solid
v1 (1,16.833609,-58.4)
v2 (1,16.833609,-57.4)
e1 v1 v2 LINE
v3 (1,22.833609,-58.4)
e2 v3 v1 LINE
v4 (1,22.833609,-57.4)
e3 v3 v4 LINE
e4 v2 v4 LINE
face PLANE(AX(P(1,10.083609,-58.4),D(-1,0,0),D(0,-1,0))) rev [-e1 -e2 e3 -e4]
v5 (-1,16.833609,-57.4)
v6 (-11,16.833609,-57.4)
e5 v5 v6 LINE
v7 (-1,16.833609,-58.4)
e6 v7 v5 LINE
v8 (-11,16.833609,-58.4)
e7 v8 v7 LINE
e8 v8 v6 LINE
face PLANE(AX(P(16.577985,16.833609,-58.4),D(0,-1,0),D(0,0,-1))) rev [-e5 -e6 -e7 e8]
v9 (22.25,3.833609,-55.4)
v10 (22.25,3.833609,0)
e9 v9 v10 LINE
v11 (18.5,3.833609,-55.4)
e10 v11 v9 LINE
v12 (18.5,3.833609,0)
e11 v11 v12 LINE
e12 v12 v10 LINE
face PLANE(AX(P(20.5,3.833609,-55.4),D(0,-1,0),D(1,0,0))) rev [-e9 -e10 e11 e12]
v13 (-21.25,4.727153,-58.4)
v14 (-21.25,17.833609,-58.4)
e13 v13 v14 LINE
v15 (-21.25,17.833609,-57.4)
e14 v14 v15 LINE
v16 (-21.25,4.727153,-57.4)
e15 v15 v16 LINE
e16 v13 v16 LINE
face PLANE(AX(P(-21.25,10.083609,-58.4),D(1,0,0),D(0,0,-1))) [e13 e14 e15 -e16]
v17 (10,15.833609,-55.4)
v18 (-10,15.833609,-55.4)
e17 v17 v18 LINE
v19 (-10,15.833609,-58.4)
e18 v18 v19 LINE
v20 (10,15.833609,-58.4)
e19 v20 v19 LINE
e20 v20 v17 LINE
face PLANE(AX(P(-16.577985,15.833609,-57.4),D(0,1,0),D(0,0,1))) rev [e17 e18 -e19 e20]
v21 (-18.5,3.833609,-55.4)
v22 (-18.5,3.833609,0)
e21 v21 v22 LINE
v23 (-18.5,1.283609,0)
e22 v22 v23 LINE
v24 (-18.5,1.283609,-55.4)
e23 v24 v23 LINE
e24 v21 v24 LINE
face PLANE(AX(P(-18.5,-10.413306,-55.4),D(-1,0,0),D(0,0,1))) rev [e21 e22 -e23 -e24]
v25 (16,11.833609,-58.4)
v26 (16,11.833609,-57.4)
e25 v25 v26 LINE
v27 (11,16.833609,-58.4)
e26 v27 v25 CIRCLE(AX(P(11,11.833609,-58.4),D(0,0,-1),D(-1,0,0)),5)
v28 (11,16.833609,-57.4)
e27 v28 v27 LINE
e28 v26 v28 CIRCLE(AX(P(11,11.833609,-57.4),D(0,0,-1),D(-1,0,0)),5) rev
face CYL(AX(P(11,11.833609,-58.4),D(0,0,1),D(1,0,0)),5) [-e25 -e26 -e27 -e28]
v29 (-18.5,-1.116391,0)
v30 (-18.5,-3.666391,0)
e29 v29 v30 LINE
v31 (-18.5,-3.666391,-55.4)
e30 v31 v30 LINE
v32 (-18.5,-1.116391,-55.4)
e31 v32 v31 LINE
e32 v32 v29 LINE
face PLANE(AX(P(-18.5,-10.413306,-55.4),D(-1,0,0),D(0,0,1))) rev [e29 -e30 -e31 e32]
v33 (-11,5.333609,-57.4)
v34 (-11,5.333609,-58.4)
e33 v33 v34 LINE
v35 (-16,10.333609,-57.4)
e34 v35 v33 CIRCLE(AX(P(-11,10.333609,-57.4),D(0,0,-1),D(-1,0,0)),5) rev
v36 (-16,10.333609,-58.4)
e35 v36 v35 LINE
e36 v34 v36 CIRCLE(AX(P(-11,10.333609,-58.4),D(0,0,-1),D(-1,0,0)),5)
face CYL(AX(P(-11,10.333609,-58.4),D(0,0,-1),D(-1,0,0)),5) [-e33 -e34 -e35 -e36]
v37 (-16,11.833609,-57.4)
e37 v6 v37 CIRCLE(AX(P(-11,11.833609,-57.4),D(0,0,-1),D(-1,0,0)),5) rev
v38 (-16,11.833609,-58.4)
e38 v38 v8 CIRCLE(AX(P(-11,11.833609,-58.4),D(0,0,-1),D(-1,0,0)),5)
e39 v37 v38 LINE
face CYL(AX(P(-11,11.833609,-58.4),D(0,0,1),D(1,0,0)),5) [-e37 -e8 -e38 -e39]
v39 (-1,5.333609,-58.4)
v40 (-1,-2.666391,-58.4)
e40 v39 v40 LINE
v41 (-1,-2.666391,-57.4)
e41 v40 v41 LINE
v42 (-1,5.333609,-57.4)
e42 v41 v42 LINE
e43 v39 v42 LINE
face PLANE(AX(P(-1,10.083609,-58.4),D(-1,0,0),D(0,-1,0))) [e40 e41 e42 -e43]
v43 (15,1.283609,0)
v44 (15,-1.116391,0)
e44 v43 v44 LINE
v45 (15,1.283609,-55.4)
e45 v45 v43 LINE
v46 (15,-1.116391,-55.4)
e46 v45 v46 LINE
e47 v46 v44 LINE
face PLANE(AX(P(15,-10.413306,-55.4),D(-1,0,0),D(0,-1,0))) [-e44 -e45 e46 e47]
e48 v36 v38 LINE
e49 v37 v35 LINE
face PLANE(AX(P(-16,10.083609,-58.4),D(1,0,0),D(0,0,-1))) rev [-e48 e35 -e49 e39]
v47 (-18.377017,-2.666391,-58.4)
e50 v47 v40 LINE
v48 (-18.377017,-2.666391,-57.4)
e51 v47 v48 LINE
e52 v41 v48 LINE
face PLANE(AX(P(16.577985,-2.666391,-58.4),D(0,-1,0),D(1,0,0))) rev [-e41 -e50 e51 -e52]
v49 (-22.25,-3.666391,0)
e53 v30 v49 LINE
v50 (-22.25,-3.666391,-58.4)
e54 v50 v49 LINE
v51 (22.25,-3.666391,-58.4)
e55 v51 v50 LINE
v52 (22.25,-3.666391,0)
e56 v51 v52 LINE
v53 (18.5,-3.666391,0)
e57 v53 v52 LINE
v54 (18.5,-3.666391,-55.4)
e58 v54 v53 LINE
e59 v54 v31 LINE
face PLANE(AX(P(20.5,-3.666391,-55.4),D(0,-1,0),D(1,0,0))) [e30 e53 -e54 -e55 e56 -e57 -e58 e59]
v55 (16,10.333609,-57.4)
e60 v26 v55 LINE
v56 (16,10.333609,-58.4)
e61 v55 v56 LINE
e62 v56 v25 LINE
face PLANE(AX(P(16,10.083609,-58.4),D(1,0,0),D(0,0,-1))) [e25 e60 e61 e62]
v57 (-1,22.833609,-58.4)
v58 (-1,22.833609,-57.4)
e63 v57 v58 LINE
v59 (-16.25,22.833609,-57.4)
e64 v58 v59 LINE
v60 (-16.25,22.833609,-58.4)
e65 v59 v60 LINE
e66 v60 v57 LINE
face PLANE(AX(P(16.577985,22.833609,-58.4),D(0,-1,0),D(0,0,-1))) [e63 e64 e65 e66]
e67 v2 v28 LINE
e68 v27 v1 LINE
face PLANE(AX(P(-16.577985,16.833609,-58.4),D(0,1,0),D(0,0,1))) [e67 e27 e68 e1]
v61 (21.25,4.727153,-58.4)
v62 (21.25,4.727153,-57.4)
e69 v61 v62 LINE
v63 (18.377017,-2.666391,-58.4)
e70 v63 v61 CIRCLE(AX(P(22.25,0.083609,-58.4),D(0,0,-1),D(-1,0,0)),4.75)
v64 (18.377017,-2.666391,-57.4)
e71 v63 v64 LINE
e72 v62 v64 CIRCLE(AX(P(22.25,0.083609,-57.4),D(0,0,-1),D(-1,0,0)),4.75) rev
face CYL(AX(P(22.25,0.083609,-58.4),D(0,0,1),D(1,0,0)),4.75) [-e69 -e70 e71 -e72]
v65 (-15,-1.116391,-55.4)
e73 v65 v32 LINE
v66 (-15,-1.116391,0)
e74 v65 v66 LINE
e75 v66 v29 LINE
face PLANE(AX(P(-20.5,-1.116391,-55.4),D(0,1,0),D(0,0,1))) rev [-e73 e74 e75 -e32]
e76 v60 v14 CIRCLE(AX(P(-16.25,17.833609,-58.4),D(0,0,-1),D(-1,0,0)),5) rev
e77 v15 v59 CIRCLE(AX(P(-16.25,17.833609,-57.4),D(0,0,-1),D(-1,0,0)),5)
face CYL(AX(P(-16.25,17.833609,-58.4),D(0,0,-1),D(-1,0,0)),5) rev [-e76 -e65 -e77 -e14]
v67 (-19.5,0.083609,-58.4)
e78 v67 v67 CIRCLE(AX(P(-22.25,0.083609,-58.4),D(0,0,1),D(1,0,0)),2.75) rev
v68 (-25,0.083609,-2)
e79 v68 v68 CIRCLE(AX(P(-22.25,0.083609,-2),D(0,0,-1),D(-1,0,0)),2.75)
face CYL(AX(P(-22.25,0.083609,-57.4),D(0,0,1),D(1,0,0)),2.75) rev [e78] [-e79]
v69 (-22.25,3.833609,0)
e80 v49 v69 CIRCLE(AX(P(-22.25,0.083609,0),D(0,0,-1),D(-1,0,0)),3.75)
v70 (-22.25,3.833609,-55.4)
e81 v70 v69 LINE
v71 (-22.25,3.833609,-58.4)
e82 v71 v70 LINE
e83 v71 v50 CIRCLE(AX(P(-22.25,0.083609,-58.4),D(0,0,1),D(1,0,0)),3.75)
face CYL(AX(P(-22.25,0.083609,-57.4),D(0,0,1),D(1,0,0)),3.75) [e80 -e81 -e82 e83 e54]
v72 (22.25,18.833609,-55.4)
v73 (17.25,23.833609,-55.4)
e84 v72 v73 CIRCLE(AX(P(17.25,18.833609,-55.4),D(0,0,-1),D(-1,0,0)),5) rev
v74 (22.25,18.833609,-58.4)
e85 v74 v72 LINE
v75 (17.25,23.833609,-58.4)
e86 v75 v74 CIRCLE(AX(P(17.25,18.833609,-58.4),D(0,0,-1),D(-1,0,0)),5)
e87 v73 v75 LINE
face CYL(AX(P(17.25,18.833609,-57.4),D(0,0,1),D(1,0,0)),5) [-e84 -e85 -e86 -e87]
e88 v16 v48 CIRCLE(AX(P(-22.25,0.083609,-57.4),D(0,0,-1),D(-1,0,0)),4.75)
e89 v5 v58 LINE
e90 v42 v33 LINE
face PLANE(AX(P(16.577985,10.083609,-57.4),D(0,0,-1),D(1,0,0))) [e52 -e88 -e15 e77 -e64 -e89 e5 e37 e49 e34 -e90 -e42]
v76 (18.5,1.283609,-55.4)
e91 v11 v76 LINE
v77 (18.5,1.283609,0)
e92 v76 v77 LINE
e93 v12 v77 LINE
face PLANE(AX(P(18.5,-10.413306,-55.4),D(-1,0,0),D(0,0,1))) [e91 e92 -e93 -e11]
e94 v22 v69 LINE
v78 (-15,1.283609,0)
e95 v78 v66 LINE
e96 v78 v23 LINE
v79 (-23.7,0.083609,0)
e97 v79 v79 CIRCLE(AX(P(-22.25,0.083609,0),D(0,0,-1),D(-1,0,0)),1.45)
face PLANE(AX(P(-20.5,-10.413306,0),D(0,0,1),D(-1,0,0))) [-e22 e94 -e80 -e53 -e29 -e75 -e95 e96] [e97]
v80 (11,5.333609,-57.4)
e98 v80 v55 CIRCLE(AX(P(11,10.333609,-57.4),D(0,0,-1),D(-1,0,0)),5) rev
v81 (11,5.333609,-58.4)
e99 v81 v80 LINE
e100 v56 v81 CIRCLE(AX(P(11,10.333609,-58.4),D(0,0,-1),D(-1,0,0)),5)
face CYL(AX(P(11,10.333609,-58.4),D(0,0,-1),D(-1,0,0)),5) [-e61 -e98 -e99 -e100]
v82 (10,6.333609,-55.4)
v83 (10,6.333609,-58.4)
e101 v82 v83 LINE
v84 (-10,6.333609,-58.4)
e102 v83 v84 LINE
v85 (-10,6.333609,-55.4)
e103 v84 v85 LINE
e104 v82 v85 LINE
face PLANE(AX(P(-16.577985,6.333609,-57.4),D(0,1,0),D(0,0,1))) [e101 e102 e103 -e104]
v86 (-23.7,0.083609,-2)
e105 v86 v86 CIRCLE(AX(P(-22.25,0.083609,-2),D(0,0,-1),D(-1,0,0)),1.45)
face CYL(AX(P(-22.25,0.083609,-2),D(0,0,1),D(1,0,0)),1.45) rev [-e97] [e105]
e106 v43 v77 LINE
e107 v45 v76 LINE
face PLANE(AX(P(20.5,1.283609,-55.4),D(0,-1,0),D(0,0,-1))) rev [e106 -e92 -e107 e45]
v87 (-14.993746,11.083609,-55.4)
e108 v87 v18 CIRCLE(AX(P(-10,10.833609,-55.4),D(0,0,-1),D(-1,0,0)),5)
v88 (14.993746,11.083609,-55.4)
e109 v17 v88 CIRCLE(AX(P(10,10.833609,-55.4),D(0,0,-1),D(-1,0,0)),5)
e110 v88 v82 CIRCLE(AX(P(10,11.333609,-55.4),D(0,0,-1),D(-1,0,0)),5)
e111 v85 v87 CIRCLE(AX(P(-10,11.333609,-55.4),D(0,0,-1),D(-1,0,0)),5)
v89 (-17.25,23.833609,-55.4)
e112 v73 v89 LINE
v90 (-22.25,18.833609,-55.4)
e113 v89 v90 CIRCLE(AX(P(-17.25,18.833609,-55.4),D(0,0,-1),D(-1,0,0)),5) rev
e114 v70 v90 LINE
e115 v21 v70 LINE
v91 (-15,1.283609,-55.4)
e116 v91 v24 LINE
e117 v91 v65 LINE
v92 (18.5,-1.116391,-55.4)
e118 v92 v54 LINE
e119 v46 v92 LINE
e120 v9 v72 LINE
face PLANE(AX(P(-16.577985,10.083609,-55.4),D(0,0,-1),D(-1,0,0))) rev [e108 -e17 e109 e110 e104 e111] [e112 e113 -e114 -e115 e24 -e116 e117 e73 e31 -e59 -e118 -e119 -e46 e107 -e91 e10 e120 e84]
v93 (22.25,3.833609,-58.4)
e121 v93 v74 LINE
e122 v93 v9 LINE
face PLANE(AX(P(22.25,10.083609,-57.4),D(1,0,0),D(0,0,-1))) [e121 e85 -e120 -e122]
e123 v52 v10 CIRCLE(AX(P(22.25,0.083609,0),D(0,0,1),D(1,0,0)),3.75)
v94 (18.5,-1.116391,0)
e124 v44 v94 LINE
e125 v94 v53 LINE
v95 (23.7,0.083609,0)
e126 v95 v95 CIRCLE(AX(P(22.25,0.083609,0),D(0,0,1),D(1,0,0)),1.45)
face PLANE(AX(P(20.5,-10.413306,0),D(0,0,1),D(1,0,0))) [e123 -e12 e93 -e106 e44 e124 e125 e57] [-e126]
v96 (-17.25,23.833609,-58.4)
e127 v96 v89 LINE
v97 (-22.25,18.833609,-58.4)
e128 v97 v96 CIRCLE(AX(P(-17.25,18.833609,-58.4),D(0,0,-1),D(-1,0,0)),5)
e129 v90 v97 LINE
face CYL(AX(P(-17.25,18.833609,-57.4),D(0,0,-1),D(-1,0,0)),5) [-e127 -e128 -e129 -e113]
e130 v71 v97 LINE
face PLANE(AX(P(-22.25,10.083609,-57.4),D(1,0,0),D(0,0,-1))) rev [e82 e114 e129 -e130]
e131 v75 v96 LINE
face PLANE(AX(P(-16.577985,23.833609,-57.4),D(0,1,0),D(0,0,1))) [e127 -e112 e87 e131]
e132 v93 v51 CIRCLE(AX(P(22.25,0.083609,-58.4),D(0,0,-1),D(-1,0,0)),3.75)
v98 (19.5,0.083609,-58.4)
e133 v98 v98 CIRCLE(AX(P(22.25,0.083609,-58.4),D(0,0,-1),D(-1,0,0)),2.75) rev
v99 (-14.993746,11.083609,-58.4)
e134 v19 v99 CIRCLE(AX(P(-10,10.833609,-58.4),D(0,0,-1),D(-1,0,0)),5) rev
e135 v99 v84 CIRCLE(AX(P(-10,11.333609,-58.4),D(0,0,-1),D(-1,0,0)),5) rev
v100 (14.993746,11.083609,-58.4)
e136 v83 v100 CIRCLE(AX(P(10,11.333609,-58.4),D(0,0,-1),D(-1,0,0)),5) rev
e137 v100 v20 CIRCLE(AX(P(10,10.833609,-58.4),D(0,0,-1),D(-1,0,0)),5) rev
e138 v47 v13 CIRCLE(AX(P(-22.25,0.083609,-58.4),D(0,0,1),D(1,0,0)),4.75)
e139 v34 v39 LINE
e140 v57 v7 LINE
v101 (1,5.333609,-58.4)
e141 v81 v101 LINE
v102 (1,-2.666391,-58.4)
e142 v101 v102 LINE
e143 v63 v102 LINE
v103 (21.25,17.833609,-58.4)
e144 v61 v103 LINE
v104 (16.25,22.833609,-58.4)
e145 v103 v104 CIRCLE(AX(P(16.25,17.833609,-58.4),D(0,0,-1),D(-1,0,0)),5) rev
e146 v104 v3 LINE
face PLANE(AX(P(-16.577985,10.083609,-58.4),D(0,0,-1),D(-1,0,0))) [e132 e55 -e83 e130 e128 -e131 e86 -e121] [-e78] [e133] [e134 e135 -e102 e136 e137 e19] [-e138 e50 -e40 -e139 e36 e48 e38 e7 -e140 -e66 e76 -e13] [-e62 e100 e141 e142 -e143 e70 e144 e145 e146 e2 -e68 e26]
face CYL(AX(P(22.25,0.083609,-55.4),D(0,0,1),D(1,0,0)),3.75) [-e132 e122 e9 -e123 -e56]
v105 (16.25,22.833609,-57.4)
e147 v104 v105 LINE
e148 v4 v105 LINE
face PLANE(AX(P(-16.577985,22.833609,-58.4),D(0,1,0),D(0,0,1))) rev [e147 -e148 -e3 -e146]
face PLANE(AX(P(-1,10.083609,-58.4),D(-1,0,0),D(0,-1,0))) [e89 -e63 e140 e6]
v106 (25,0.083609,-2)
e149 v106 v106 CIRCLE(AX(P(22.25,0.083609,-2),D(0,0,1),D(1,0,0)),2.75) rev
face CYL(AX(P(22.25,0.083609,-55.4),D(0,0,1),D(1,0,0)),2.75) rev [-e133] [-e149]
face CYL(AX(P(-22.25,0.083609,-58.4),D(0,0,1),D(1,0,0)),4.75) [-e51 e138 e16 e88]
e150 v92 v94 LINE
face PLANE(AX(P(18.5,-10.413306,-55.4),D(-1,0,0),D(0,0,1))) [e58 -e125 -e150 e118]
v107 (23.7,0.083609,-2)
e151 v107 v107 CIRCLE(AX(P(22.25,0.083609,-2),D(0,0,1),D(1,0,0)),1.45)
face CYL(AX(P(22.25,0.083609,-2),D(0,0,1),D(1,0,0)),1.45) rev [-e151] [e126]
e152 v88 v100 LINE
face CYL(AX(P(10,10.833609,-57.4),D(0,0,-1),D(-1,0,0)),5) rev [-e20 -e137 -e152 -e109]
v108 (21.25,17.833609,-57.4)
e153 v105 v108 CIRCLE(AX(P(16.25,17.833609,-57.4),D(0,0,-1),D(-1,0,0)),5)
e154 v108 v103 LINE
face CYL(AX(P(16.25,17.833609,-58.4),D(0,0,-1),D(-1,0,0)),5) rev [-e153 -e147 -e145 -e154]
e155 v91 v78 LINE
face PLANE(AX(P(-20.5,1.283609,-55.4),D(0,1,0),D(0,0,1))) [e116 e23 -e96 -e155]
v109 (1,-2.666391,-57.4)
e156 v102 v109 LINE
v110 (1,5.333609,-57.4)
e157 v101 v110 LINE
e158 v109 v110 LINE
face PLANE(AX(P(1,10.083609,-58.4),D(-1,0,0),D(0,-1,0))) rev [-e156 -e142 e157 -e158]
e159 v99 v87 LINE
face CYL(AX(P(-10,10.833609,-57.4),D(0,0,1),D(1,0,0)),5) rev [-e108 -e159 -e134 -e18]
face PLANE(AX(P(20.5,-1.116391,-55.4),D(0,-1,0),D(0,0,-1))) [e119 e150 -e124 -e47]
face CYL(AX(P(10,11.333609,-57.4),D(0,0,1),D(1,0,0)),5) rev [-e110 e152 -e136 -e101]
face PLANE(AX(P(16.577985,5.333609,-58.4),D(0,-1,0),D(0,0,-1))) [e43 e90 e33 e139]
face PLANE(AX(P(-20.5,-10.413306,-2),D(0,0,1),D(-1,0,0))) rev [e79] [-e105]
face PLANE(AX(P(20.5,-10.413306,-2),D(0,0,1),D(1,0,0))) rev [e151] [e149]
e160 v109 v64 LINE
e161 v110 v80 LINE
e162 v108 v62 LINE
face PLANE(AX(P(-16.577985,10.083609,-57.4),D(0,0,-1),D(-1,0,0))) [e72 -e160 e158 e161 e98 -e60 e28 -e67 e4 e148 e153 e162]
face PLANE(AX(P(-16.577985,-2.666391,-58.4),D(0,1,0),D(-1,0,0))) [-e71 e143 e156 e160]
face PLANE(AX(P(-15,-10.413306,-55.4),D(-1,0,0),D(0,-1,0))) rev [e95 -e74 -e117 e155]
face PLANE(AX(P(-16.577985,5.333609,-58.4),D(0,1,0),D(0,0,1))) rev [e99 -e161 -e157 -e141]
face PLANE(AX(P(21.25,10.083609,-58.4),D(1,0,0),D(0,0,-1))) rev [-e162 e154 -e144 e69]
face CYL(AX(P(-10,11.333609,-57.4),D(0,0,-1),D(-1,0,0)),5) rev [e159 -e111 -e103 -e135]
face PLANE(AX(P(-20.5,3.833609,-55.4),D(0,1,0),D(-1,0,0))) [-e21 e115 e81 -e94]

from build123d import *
from build123d.topology import SkipClean

# Parameters (mm, degrees)
SKETCH_1_W           = 3.5
SKETCH_1_H           = 1.2
EXTRUDE_1_DEPTH      = 55.4
EXTRUDE_2_DEPTH      = 2
SKETCH_2_W           = 1
SKETCH_2_H           = 8
EXTRUDE_4_DEPTH      = 2
SKETCH_2_3_W         = 1
SKETCH_2_3_H         = 8
EXTRUDE_6_DEPTH      = 3
FILLET_1_R           = 5
MIRROR_START         = -57.4
MIRROR_2_OUTLINE_R   = 2.75
MIRROR_2_DEPTH       = 2
MIRROR_START_2       = -58.4
MIRROR_2_2_OUTLINE_R = 2.75
MIRROR_2_2_DEPTH     = 1


# Read off the part's stored shape, not the designer's step: 镜向2
with BuildPart() as part:
    # 草图1 → 拉伸1 (new body)
    with BuildSketch(Plane.XY):
        with BuildLine():
            ThreePointArc((19.5, 0.083609377), (22.25, 2.833609377), (25, 0.083609377))
            Line((25, 0.083609377), (26, 0.083609377))
            ThreePointArc((26, 0.083609377), (24.901650429, 2.735259807), (22.25, 3.833609377))
            ThreePointArc((22.25, 3.833609377), (19.598349571, 2.735259807), (18.5, 0.083609377))
            Line((18.5, 0.083609377), (19.5, 0.083609377))
        make_face()
        with BuildLine():
            Line((26, 0.083609377), (25, 0.083609377))
            ThreePointArc((25, 0.083609377), (22.25, -2.666390623), (19.5, 0.083609377))
            Line((19.5, 0.083609377), (18.5, 0.083609377))
            ThreePointArc((18.5, 0.083609377), (19.598349571, -2.568041052), (22.25, -3.666390623))
            ThreePointArc((22.25, -3.666390623), (24.901650429, -2.568041052), (26, 0.083609377))
        make_face()
        with BuildLine():
            ThreePointArc((19.5, 0.083609377), (22.25, 2.833609377), (25, 0.083609377))
            Line((25, 0.083609377), (26, 0.083609377))
            ThreePointArc((26, 0.083609377), (24.901650429, 2.735259807), (22.25, 3.833609377))
            ThreePointArc((22.25, 3.833609377), (19.598349571, 2.735259807), (18.5, 0.083609377))
            Line((18.5, 0.083609377), (19.5, 0.083609377))
        make_face()
        with BuildLine():
            Line((26, 0.083609377), (25, 0.083609377))
            ThreePointArc((25, 0.083609377), (22.25, -2.666390623), (19.5, 0.083609377))
            Line((19.5, 0.083609377), (18.5, 0.083609377))
            ThreePointArc((18.5, 0.083609377), (19.598349571, -2.568041052), (22.25, -3.666390623))
            ThreePointArc((22.25, -3.666390623), (24.901650429, -2.568041052), (26, 0.083609377))
        make_face()
        with BuildLine():
            ThreePointArc((18.5, 0.083609377), (19.598349571, 2.735259807), (22.25, 3.833609377))
            Line((22.25, 3.833609377), (18.5, 3.833609377))
            Line((18.5, 3.833609377), (18.5, 1.283609377))
            Line((18.5, 1.283609377), (18.5, 0.083609377))
        make_face()
        with BuildLine():
            Line((18.5, -3.666390623), (22.25, -3.666390623))
            ThreePointArc((22.25, -3.666390623), (19.598349571, -2.568041052), (18.5, 0.083609377))
            Line((18.5, 0.083609377), (18.5, -1.116390623))
            Line((18.5, -1.116390623), (18.5, -3.666390623))
        make_face()
        with Locations((16.75, -0.516390623)):
            Rectangle(SKETCH_1_W, SKETCH_1_H)
        with Locations((16.75, 0.683609377)):
            Rectangle(SKETCH_1_W, SKETCH_1_H)
    extrude_1 = extrude(amount=-EXTRUDE_1_DEPTH)

    # 草图1<3> → 拉伸2 (add)
    with BuildSketch(Plane.XY):
        with BuildLine():
            ThreePointArc((20.8, 0.083609377), (22.25, 1.533609377), (23.7, 0.083609377))
            Line((23.7, 0.083609377), (25, 0.083609377))
            ThreePointArc((25, 0.083609377), (22.25, 2.833609377), (19.5, 0.083609377))
            Line((19.5, 0.083609377), (20.8, 0.083609377))
        make_face()
        with BuildLine():
            Line((25, 0.083609377), (23.7, 0.083609377))
            ThreePointArc((23.7, 0.083609377), (22.25, -1.366390623), (20.8, 0.083609377))
            Line((20.8, 0.083609377), (19.5, 0.083609377))
            ThreePointArc((19.5, 0.083609377), (22.25, -2.666390623), (25, 0.083609377))
        make_face()
        with BuildLine():
            ThreePointArc((20.8, 0.083609377), (22.25, 1.533609377), (23.7, 0.083609377))
            Line((23.7, 0.083609377), (25, 0.083609377))
            ThreePointArc((25, 0.083609377), (22.25, 2.833609377), (19.5, 0.083609377))
            Line((19.5, 0.083609377), (20.8, 0.083609377))
        make_face()
        with BuildLine():
            Line((25, 0.083609377), (23.7, 0.083609377))
            ThreePointArc((23.7, 0.083609377), (22.25, -1.366390623), (20.8, 0.083609377))
            Line((20.8, 0.083609377), (19.5, 0.083609377))
            ThreePointArc((19.5, 0.083609377), (22.25, -2.666390623), (25, 0.083609377))
        make_face()
    extrude_2 = extrude(amount=-EXTRUDE_2_DEPTH)

    # 草图2 → 拉伸4 (add)
    # profile 1 of 10: a face of its own
    with SkipClean():  # the faces are left unmerged after this step: merging them gives an invalid solid
        with BuildSketch(Plane(origin=(0, 0, -55.4), x_dir=(-1, 0, 0), z_dir=(0, 0, -1))):
            with BuildLine():
                Line((-22.25, 23.833609377), (-22.25, 3.833609377))
                Line((-22.25, 3.833609377), (-19.334524053, 3.833609377))
                ThreePointArc((-19.334524053, 3.833609377), (-20.241930491, 4.388276246), (-21.25, 4.727153282))
                Line((-21.25, 4.727153282), (-21.25, 22.833609377))
                Line((-21.25, 22.833609377), (-1, 22.833609377))
                Line((-1, 22.833609377), (-1, 16.833609377))
                Line((-1, 16.833609377), (-16, 16.833609377))
                Line((-16, 16.833609377), (-16, 5.333609377))
                Line((-16, 5.333609377), (-1, 5.333609377))
                Line((-1, 5.333609377), (0, 5.333609377))
                Line((0, 5.333609377), (0, 6.333609377))
                Line((0, 6.333609377), (-15, 6.333609377))
                Line((-15, 6.333609377), (-15, 15.833609377))
                Line((-15, 15.833609377), (0, 15.833609377))
                Line((0, 15.833609377), (0, 23.833609377))
                Line((0, 23.833609377), (-22.25, 23.833609377))
            make_face()
        # profile 2 of 10: a face of its own
        with BuildSketch(Plane(origin=(0, 0, -55.4), x_dir=(-1, 0, 0), z_dir=(0, 0, -1))):
            with BuildLine():
                ThreePointArc((-17.654077894, -1.116390623), (-17.945210239, -1.924196667), (-18.377016654, -2.666390623))
                Line((-18.377016654, -2.666390623), (-1, -2.666390623))
                Line((-1, -2.666390623), (-1, 5.333609377))
                Line((-1, 5.333609377), (-16, 5.333609377))
                Line((-16, 5.333609377), (-16, 16.833609377))
                Line((-16, 16.833609377), (-1, 16.833609377))
                Line((-1, 16.833609377), (-1, 22.833609377))
                Line((-1, 22.833609377), (-21.25, 22.833609377))
                Line((-21.25, 22.833609377), (-21.25, 4.727153282))
                ThreePointArc((-21.25, 4.727153282), (-20.241930491, 4.388276246), (-19.334524053, 3.833609377))
                Line((-19.334524053, 3.833609377), (-18.5, 3.833609377))
                Line((-18.5, 3.833609377), (-18.5, 2.999085325))
                ThreePointArc((-18.5, 2.999085325), (-17.989798317, 2.184366769), (-17.654077894, 1.283609377))
                Line((-17.654077894, 1.283609377), (-15, 1.283609377))
                Line((-15, 1.283609377), (-15, -1.116390623))
                Line((-15, -1.116390623), (-17.654077894, -1.116390623))
            make_face()
        # profile 3 of 10: a face of its own
        with BuildSketch(Plane(origin=(0, 0, -55.4), x_dir=(-1, 0, 0), z_dir=(0, 0, -1))):
            with Locations((-0.5, 1.333609377)):
                Rectangle(SKETCH_2_W, SKETCH_2_H)
        # profile 4 of 10: a face of its own
        with BuildSketch(Plane(origin=(0, 0, -55.4), x_dir=(-1, 0, 0), z_dir=(0, 0, -1))):
            with BuildLine():
                ThreePointArc((-17.654077894, 1.283609377), (-17.989798317, 2.184366769), (-18.5, 2.999085325))
                Line((-18.5, 2.999085325), (-18.5, 1.283609377))
                Line((-18.5, 1.283609377), (-17.654077894, 1.283609377))
            make_face()
        # profile 5 of 10: a face of its own
        with BuildSketch(Plane(origin=(0, 0, -55.4), x_dir=(-1, 0, 0), z_dir=(0, 0, -1))):
            with BuildLine():
                Line((-18.5, -1.116390623), (-18.5, -2.666390623))
                Line((-18.5, -2.666390623), (-18.377016654, -2.666390623))
                ThreePointArc((-18.377016654, -2.666390623), (-17.945210239, -1.924196667), (-17.654077894, -1.116390623))
                Line((-17.654077894, -1.116390623), (-18.5, -1.116390623))
            make_face()
        # profile 6 of 10: a face of its own
        with BuildSketch(Plane(origin=(0, 0, -55.4), x_dir=(-1, 0, 0), z_dir=(0, 0, -1))):
            with BuildLine():
                ThreePointArc((-17.654077894, 1.283609377), (-17.5, 0.083609377), (-17.654077894, -1.116390623))
                Line((-17.654077894, -1.116390623), (-15, -1.116390623))
                Line((-15, -1.116390623), (-15, 1.283609377))
                Line((-15, 1.283609377), (-17.654077894, 1.283609377))
            make_face()
        # profile 7 of 10: a face of its own
        with BuildSketch(Plane(origin=(0, 0, -55.4), x_dir=(-1, 0, 0), z_dir=(0, 0, -1))):
            with BuildLine():
                Line((-22.25, -3.666390623), (-18.5, -3.666390623))
                Line((-18.5, -3.666390623), (-18.5, -2.666390623))
                Line((-18.5, -2.666390623), (-18.5, -1.116390623))
                Line((-18.5, -1.116390623), (-17.654077894, -1.116390623))
                ThreePointArc((-17.654077894, -1.116390623), (-17.5, 0.083609377), (-17.654077894, 1.283609377))
                Line((-17.654077894, 1.283609377), (-18.5, 1.283609377))
                Line((-18.5, 1.283609377), (-18.5, 2.999085325))
                ThreePointArc((-18.5, 2.999085325), (-18.891242789, 3.442366588), (-19.334524053, 3.833609377))
                Line((-19.334524053, 3.833609377), (-22.25, 3.833609377))
                ThreePointArc((-22.25, 3.833609377), (-21.745411195, 3.799506327), (-21.25, 3.697817451))
                ThreePointArc((-21.25, 3.697817451), (-19.265665903, 2.354347143), (-18.5, 0.083609377))
                ThreePointArc((-18.5, 0.083609377), (-19.598349571, -2.568041052), (-22.25, -3.666390623))
            make_face()
        # profile 8 of 10: a face of its own
        with BuildSketch(Plane(origin=(0, 0, -55.4), x_dir=(-1, 0, 0), z_dir=(0, 0, -1))):
            with BuildLine():
                ThreePointArc((-22.25, 3.833609377), (-26, 0.083609377), (-22.25, -3.666390623))
                ThreePointArc((-22.25, -3.666390623), (-19.598349571, -2.568041052), (-18.5, 0.083609377))
                ThreePointArc((-18.5, 0.083609377), (-19.265665903, 2.354347143), (-21.25, 3.697817451))
                ThreePointArc((-21.25, 3.697817451), (-21.745411195, 3.799506327), (-22.25, 3.833609377))
            make_face()
            with BuildLine():
                ThreePointArc((-22.25, -2.666390623), (-24.952524621, 0.592392901), (-21.25, 2.645347069))
                ThreePointArc((-21.25, 2.645347069), (-19.979262234, 1.634818583), (-19.5, 0.083609377))
                ThreePointArc((-19.5, 0.083609377), (-20.305456352, -1.860934271), (-22.25, -2.666390623))
            make_face(mode=Mode.SUBTRACT)
        # profile 9 of 10: a face of its own
        with BuildSketch(Plane(origin=(0, 0, -55.4), x_dir=(-1, 0, 0), z_dir=(0, 0, -1))):
            Polygon((-18.5, -2.666390623), (-18.5, -3.666390623), (0, -3.666390623), (0, -2.666390623), (-1, -2.666390623), (-18.377016654, -2.666390623), align=None)
        # profile 10 of 10: a face of its own
        with BuildSketch(Plane(origin=(0, 0, -55.4), x_dir=(-1, 0, 0), z_dir=(0, 0, -1))):
            with BuildLine():
                Line((-18.5, 3.833609377), (-19.334524053, 3.833609377))
                ThreePointArc((-19.334524053, 3.833609377), (-18.891242789, 3.442366588), (-18.5, 2.999085325))
                Line((-18.5, 2.999085325), (-18.5, 3.833609377))
            make_face()
        extrude(amount=EXTRUDE_4_DEPTH)

    # 草图2<3> → 拉伸6 (add)
    # profile 1 of 7: a face of its own
    with SkipClean():  # the faces are left unmerged after this step: merging them gives an invalid solid
        with BuildSketch(Plane(origin=(0, 0, -55.4), x_dir=(-1, 0, 0), z_dir=(0, 0, -1))):
            with BuildLine():
                Line((-22.25, 23.833609377), (-22.25, 3.833609377))
                Line((-22.25, 3.833609377), (-19.334524053, 3.833609377))
                ThreePointArc((-19.334524053, 3.833609377), (-20.241930491, 4.388276246), (-21.25, 4.727153282))
                Line((-21.25, 4.727153282), (-21.25, 22.833609377))
                Line((-21.25, 22.833609377), (-1, 22.833609377))
                Line((-1, 22.833609377), (-1, 16.833609377))
                Line((-1, 16.833609377), (-16, 16.833609377))
                Line((-16, 16.833609377), (-16, 5.333609377))
                Line((-16, 5.333609377), (-1, 5.333609377))
                Line((-1, 5.333609377), (0, 5.333609377))
                Line((0, 5.333609377), (0, 6.333609377))
                Line((0, 6.333609377), (-15, 6.333609377))
                Line((-15, 6.333609377), (-15, 15.833609377))
                Line((-15, 15.833609377), (0, 15.833609377))
                Line((0, 15.833609377), (0, 23.833609377))
                Line((0, 23.833609377), (-22.25, 23.833609377))
            make_face()
        # profile 2 of 7: a face of its own
        with BuildSketch(Plane(origin=(0, 0, -55.4), x_dir=(-1, 0, 0), z_dir=(0, 0, -1))):
            with BuildLine():
                Line((-22.25, -3.666390623), (-18.5, -3.666390623))
                Line((-18.5, -3.666390623), (-18.5, -2.666390623))
                Line((-18.5, -2.666390623), (-18.5, -1.116390623))
                Line((-18.5, -1.116390623), (-17.654077894, -1.116390623))
                ThreePointArc((-17.654077894, -1.116390623), (-17.5, 0.083609377), (-17.654077894, 1.283609377))
                Line((-17.654077894, 1.283609377), (-18.5, 1.283609377))
                Line((-18.5, 1.283609377), (-18.5, 2.999085325))
                ThreePointArc((-18.5, 2.999085325), (-18.891242789, 3.442366588), (-19.334524053, 3.833609377))
                Line((-19.334524053, 3.833609377), (-22.25, 3.833609377))
                ThreePointArc((-22.25, 3.833609377), (-21.745411195, 3.799506327), (-21.25, 3.697817451))
                ThreePointArc((-21.25, 3.697817451), (-19.265665903, 2.354347143), (-18.5, 0.083609377))
                ThreePointArc((-18.5, 0.083609377), (-19.598349571, -2.568041052), (-22.25, -3.666390623))
            make_face()
        # profile 3 of 7: a face of its own
        with BuildSketch(Plane(origin=(0, 0, -55.4), x_dir=(-1, 0, 0), z_dir=(0, 0, -1))):
            with BuildLine():
                ThreePointArc((-17.654077894, 1.283609377), (-17.989798317, 2.184366769), (-18.5, 2.999085325))
                Line((-18.5, 2.999085325), (-18.5, 1.283609377))
                Line((-18.5, 1.283609377), (-17.654077894, 1.283609377))
            make_face()
        # profile 4 of 7: a face of its own
        with BuildSketch(Plane(origin=(0, 0, -55.4), x_dir=(-1, 0, 0), z_dir=(0, 0, -1))):
            with BuildLine():
                Line((-18.5, -1.116390623), (-18.5, -2.666390623))
                Line((-18.5, -2.666390623), (-18.377016654, -2.666390623))
                ThreePointArc((-18.377016654, -2.666390623), (-17.945210239, -1.924196667), (-17.654077894, -1.116390623))
                Line((-17.654077894, -1.116390623), (-18.5, -1.116390623))
            make_face()
        # profile 5 of 7: a face of its own
        with BuildSketch(Plane(origin=(0, 0, -55.4), x_dir=(-1, 0, 0), z_dir=(0, 0, -1))):
            Polygon((-18.5, -2.666390623), (-18.5, -3.666390623), (0, -3.666390623), (0, -2.666390623), (-1, -2.666390623), (-18.377016654, -2.666390623), align=None)
        # profile 6 of 7: a face of its own
        with BuildSketch(Plane(origin=(0, 0, -55.4), x_dir=(-1, 0, 0), z_dir=(0, 0, -1))):
            with Locations((-0.5, 1.333609377)):
                Rectangle(SKETCH_2_3_W, SKETCH_2_3_H)
        # profile 7 of 7: a face of its own
        with BuildSketch(Plane(origin=(0, 0, -55.4), x_dir=(-1, 0, 0), z_dir=(0, 0, -1))):
            with BuildLine():
                ThreePointArc((-22.25, 3.833609377), (-26, 0.083609377), (-22.25, -3.666390623))
                ThreePointArc((-22.25, -3.666390623), (-19.598349571, -2.568041052), (-18.5, 0.083609377))
                ThreePointArc((-18.5, 0.083609377), (-19.265665903, 2.354347143), (-21.25, 3.697817451))
                ThreePointArc((-21.25, 3.697817451), (-21.745411195, 3.799506327), (-22.25, 3.833609377))
            make_face()
            with BuildLine():
                ThreePointArc((-22.25, -2.666390623), (-24.952524621, 0.592392901), (-21.25, 2.645347069))
                ThreePointArc((-21.25, 2.645347069), (-19.979262234, 1.634818583), (-19.5, 0.083609377))
                ThreePointArc((-19.5, 0.083609377), (-20.305456352, -1.860934271), (-22.25, -2.666390623))
            make_face(mode=Mode.SUBTRACT)
        extrude(amount=EXTRUDE_6_DEPTH)

    # 圆角1
    # the kernel refuses this fillet: 5 mm, written as the material it adds along each edge
    with BuildSketch(Plane(origin=(21.25, 22.833609377, -44.9), x_dir=(0, -1, 0), z_dir=(0, 0, -1))) as fillet_1_piece_1_section:
        with BuildLine():
            CenterArc((FILLET_1_R, FILLET_1_R), FILLET_1_R, 180, 90)
            Line((0, FILLET_1_R), (0, 0))
            Line((0, 0), (FILLET_1_R, 0))
        make_face()
    fillet_1_piece_1 = extrude(amount=13.5, mode=Mode.PRIVATE)
    fillet_1_piece_1 = split(fillet_1_piece_1, bisect_by=Plane(origin=(20.133160305, 21.716769682, -55.4), z_dir=(0, 0, -1)), keep=Keep.TOP, mode=Mode.PRIVATE)
    add(fillet_1_piece_1)
    with BuildSketch(Plane(origin=(15, 6.333609377, -55.4), x_dir=(-1, 0, 0), z_dir=(0, 0, -1)), Plane(origin=(15, 15.833609377, -55.4), x_dir=(0, -1, 0), z_dir=(0, 0, -1))) as fillet_1_piece_2:
        with BuildLine():
            CenterArc((FILLET_1_R, FILLET_1_R), FILLET_1_R, 180, 90)
            Line((0, FILLET_1_R), (0, 0))
            Line((0, 0), (FILLET_1_R, 0))
        make_face()
    extrude(amount=2)
    with BuildSketch(Plane(origin=(15, 15.833609377, -57.4), x_dir=(0, -1, 0), z_dir=(0, 0, -1)), Plane(origin=(15, 6.333609377, -57.4), x_dir=(-1, 0, 0), z_dir=(0, 0, -1))) as fillet_1_piece_3:
        with BuildLine():
            CenterArc((FILLET_1_R, FILLET_1_R), FILLET_1_R, 180, 90)
            Line((0, FILLET_1_R), (0, 0))
            Line((0, 0), (FILLET_1_R, 0))
        make_face()
    extrude(amount=1)
    # the kernel refuses this fillet: 5 mm, written as the material it takes off along each edge
    with BuildSketch(Plane(origin=(16, 5.333609377, -57.4), x_dir=(0, 1, 0), z_dir=(0, 0, -1)), Plane(origin=(16, 16.833609377, -57.4), x_dir=(-1, 0, 0), z_dir=(0, 0, -1)), Plane(origin=(22.25, 23.833609377, -57.4), x_dir=(-1, 0, 0), z_dir=(0, 0, -1))) as fillet_1_2_piece_1:
        with BuildLine():
            CenterArc((FILLET_1_R, -FILLET_1_R), FILLET_1_R, 90, 90)
            Line((0, -FILLET_1_R), (0, 0))
            Line((0, 0), (FILLET_1_R, 0))
        make_face()
    extrude(amount=13.5, mode=Mode.SUBTRACT)
    with BuildSketch(Plane(origin=(22.25, 23.833609377, -42.9), x_dir=(-1, 0, 0), z_dir=(0, 0, -1))) as fillet_1_2_piece_2:
        with BuildLine():
            CenterArc((FILLET_1_R, -FILLET_1_R), FILLET_1_R, 90, 90)
            Line((0, -FILLET_1_R), (0, 0))
            Line((0, 0), (FILLET_1_R, 0))
        make_face()
    extrude(amount=14.5, mode=Mode.SUBTRACT)

    # 镜向2 outline → 镜向2 (add)
    with BuildSketch(Plane.XY.offset(MIRROR_START)):
        with BuildLine():
            ThreePointArc((-22.25, 3.833609377), (-26, 0.083609377), (-22.25, -3.666390623))
            Line((-22.25, -3.666390623), (0, -3.666390623))
            Line((0, -3.666390623), (0, 6.333609377))
            Line((0, 6.333609377), (-10, 6.333609377))
            ThreePointArc((-10, 6.333609377), (-13.446012188, 7.710765191), (-14.993746089, 11.083609377))
            ThreePointArc((-14.993746089, 11.083609377), (-13.446012188, 14.456453564), (-10, 15.833609377))
            Line((-10, 15.833609377), (0, 15.833609377))
            Line((0, 15.833609377), (0, 23.833609377))
            Line((0, 23.833609377), (-17.25, 23.833609377))
            ThreePointArc((-17.25, 23.833609377), (-20.785533906, 22.369143283), (-22.25, 18.833609377))
            Line((-22.25, 18.833609377), (-22.25, 3.833609377))
        make_face()
        with Locations((-22.25, 0.083609377)):
            Circle(MIRROR_2_OUTLINE_R, mode=Mode.SUBTRACT)
    extrude(amount=MIRROR_2_DEPTH)

    # Mirror 2 2 outline → Mirror 2 2 (add)
    with BuildSketch(Plane.XY.offset(MIRROR_START_2)):
        with BuildLine():
            ThreePointArc((-22.25, 3.833609377), (-26, 0.083609377), (-22.25, -3.666390623))
            Line((-22.25, -3.666390623), (0, -3.666390623))
            Line((0, -3.666390623), (0, 6.333609377))
            Line((0, 6.333609377), (-10, 6.333609377))
            ThreePointArc((-10, 6.333609377), (-13.446012188, 7.710765191), (-14.993746089, 11.083609377))
            ThreePointArc((-14.993746089, 11.083609377), (-13.446012188, 14.456453564), (-10, 15.833609377))
            Line((-10, 15.833609377), (0, 15.833609377))
            Line((0, 15.833609377), (0, 23.833609377))
            Line((0, 23.833609377), (-17.25, 23.833609377))
            ThreePointArc((-17.25, 23.833609377), (-20.785533906, 22.369143283), (-22.25, 18.833609377))
            Line((-22.25, 18.833609377), (-22.25, 3.833609377))
        make_face()
        with Locations((-22.25, 0.083609377)):
            Circle(MIRROR_2_2_OUTLINE_R, mode=Mode.SUBTRACT)
        with BuildLine():
            Line((-1, -2.666390623), (-18.377016654, -2.666390623))
            ThreePointArc((-18.377016654, -2.666390623), (-17.822516003, 1.804041142), (-21.25, 4.727153282))
            Line((-21.25, 4.727153282), (-21.25, 17.833609377))
            ThreePointArc((-21.25, 17.833609377), (-19.785533906, 21.369143283), (-16.25, 22.833609377))
            Line((-16.25, 22.833609377), (-1, 22.833609377))
            Line((-1, 22.833609377), (-1, 16.833609377))
            Line((-1, 16.833609377), (-11, 16.833609377))
            ThreePointArc((-11, 16.833609377), (-14.535533906, 15.369143283), (-16, 11.833609377))
            Line((-16, 11.833609377), (-16, 10.333609377))
            ThreePointArc((-16, 10.333609377), (-14.535533906, 6.798075471), (-11, 5.333609377))
            Line((-11, 5.333609377), (-1, 5.333609377))
            Line((-1, 5.333609377), (-1, -2.666390623))
        make_face(mode=Mode.SUBTRACT)
    extrude(amount=MIRROR_2_2_DEPTH)

    # 镜向3: 拉伸1, 拉伸2 across plane
    add(extrude_1.mirror(Plane(origin=(0, 0, 0), x_dir=(0, 0, 1), z_dir=(1, 0, 0))))
    add(extrude_2.mirror(Plane(origin=(0, 0, 0), x_dir=(0, 0, 1), z_dir=(1, 0, 0))))


solid = part.part
